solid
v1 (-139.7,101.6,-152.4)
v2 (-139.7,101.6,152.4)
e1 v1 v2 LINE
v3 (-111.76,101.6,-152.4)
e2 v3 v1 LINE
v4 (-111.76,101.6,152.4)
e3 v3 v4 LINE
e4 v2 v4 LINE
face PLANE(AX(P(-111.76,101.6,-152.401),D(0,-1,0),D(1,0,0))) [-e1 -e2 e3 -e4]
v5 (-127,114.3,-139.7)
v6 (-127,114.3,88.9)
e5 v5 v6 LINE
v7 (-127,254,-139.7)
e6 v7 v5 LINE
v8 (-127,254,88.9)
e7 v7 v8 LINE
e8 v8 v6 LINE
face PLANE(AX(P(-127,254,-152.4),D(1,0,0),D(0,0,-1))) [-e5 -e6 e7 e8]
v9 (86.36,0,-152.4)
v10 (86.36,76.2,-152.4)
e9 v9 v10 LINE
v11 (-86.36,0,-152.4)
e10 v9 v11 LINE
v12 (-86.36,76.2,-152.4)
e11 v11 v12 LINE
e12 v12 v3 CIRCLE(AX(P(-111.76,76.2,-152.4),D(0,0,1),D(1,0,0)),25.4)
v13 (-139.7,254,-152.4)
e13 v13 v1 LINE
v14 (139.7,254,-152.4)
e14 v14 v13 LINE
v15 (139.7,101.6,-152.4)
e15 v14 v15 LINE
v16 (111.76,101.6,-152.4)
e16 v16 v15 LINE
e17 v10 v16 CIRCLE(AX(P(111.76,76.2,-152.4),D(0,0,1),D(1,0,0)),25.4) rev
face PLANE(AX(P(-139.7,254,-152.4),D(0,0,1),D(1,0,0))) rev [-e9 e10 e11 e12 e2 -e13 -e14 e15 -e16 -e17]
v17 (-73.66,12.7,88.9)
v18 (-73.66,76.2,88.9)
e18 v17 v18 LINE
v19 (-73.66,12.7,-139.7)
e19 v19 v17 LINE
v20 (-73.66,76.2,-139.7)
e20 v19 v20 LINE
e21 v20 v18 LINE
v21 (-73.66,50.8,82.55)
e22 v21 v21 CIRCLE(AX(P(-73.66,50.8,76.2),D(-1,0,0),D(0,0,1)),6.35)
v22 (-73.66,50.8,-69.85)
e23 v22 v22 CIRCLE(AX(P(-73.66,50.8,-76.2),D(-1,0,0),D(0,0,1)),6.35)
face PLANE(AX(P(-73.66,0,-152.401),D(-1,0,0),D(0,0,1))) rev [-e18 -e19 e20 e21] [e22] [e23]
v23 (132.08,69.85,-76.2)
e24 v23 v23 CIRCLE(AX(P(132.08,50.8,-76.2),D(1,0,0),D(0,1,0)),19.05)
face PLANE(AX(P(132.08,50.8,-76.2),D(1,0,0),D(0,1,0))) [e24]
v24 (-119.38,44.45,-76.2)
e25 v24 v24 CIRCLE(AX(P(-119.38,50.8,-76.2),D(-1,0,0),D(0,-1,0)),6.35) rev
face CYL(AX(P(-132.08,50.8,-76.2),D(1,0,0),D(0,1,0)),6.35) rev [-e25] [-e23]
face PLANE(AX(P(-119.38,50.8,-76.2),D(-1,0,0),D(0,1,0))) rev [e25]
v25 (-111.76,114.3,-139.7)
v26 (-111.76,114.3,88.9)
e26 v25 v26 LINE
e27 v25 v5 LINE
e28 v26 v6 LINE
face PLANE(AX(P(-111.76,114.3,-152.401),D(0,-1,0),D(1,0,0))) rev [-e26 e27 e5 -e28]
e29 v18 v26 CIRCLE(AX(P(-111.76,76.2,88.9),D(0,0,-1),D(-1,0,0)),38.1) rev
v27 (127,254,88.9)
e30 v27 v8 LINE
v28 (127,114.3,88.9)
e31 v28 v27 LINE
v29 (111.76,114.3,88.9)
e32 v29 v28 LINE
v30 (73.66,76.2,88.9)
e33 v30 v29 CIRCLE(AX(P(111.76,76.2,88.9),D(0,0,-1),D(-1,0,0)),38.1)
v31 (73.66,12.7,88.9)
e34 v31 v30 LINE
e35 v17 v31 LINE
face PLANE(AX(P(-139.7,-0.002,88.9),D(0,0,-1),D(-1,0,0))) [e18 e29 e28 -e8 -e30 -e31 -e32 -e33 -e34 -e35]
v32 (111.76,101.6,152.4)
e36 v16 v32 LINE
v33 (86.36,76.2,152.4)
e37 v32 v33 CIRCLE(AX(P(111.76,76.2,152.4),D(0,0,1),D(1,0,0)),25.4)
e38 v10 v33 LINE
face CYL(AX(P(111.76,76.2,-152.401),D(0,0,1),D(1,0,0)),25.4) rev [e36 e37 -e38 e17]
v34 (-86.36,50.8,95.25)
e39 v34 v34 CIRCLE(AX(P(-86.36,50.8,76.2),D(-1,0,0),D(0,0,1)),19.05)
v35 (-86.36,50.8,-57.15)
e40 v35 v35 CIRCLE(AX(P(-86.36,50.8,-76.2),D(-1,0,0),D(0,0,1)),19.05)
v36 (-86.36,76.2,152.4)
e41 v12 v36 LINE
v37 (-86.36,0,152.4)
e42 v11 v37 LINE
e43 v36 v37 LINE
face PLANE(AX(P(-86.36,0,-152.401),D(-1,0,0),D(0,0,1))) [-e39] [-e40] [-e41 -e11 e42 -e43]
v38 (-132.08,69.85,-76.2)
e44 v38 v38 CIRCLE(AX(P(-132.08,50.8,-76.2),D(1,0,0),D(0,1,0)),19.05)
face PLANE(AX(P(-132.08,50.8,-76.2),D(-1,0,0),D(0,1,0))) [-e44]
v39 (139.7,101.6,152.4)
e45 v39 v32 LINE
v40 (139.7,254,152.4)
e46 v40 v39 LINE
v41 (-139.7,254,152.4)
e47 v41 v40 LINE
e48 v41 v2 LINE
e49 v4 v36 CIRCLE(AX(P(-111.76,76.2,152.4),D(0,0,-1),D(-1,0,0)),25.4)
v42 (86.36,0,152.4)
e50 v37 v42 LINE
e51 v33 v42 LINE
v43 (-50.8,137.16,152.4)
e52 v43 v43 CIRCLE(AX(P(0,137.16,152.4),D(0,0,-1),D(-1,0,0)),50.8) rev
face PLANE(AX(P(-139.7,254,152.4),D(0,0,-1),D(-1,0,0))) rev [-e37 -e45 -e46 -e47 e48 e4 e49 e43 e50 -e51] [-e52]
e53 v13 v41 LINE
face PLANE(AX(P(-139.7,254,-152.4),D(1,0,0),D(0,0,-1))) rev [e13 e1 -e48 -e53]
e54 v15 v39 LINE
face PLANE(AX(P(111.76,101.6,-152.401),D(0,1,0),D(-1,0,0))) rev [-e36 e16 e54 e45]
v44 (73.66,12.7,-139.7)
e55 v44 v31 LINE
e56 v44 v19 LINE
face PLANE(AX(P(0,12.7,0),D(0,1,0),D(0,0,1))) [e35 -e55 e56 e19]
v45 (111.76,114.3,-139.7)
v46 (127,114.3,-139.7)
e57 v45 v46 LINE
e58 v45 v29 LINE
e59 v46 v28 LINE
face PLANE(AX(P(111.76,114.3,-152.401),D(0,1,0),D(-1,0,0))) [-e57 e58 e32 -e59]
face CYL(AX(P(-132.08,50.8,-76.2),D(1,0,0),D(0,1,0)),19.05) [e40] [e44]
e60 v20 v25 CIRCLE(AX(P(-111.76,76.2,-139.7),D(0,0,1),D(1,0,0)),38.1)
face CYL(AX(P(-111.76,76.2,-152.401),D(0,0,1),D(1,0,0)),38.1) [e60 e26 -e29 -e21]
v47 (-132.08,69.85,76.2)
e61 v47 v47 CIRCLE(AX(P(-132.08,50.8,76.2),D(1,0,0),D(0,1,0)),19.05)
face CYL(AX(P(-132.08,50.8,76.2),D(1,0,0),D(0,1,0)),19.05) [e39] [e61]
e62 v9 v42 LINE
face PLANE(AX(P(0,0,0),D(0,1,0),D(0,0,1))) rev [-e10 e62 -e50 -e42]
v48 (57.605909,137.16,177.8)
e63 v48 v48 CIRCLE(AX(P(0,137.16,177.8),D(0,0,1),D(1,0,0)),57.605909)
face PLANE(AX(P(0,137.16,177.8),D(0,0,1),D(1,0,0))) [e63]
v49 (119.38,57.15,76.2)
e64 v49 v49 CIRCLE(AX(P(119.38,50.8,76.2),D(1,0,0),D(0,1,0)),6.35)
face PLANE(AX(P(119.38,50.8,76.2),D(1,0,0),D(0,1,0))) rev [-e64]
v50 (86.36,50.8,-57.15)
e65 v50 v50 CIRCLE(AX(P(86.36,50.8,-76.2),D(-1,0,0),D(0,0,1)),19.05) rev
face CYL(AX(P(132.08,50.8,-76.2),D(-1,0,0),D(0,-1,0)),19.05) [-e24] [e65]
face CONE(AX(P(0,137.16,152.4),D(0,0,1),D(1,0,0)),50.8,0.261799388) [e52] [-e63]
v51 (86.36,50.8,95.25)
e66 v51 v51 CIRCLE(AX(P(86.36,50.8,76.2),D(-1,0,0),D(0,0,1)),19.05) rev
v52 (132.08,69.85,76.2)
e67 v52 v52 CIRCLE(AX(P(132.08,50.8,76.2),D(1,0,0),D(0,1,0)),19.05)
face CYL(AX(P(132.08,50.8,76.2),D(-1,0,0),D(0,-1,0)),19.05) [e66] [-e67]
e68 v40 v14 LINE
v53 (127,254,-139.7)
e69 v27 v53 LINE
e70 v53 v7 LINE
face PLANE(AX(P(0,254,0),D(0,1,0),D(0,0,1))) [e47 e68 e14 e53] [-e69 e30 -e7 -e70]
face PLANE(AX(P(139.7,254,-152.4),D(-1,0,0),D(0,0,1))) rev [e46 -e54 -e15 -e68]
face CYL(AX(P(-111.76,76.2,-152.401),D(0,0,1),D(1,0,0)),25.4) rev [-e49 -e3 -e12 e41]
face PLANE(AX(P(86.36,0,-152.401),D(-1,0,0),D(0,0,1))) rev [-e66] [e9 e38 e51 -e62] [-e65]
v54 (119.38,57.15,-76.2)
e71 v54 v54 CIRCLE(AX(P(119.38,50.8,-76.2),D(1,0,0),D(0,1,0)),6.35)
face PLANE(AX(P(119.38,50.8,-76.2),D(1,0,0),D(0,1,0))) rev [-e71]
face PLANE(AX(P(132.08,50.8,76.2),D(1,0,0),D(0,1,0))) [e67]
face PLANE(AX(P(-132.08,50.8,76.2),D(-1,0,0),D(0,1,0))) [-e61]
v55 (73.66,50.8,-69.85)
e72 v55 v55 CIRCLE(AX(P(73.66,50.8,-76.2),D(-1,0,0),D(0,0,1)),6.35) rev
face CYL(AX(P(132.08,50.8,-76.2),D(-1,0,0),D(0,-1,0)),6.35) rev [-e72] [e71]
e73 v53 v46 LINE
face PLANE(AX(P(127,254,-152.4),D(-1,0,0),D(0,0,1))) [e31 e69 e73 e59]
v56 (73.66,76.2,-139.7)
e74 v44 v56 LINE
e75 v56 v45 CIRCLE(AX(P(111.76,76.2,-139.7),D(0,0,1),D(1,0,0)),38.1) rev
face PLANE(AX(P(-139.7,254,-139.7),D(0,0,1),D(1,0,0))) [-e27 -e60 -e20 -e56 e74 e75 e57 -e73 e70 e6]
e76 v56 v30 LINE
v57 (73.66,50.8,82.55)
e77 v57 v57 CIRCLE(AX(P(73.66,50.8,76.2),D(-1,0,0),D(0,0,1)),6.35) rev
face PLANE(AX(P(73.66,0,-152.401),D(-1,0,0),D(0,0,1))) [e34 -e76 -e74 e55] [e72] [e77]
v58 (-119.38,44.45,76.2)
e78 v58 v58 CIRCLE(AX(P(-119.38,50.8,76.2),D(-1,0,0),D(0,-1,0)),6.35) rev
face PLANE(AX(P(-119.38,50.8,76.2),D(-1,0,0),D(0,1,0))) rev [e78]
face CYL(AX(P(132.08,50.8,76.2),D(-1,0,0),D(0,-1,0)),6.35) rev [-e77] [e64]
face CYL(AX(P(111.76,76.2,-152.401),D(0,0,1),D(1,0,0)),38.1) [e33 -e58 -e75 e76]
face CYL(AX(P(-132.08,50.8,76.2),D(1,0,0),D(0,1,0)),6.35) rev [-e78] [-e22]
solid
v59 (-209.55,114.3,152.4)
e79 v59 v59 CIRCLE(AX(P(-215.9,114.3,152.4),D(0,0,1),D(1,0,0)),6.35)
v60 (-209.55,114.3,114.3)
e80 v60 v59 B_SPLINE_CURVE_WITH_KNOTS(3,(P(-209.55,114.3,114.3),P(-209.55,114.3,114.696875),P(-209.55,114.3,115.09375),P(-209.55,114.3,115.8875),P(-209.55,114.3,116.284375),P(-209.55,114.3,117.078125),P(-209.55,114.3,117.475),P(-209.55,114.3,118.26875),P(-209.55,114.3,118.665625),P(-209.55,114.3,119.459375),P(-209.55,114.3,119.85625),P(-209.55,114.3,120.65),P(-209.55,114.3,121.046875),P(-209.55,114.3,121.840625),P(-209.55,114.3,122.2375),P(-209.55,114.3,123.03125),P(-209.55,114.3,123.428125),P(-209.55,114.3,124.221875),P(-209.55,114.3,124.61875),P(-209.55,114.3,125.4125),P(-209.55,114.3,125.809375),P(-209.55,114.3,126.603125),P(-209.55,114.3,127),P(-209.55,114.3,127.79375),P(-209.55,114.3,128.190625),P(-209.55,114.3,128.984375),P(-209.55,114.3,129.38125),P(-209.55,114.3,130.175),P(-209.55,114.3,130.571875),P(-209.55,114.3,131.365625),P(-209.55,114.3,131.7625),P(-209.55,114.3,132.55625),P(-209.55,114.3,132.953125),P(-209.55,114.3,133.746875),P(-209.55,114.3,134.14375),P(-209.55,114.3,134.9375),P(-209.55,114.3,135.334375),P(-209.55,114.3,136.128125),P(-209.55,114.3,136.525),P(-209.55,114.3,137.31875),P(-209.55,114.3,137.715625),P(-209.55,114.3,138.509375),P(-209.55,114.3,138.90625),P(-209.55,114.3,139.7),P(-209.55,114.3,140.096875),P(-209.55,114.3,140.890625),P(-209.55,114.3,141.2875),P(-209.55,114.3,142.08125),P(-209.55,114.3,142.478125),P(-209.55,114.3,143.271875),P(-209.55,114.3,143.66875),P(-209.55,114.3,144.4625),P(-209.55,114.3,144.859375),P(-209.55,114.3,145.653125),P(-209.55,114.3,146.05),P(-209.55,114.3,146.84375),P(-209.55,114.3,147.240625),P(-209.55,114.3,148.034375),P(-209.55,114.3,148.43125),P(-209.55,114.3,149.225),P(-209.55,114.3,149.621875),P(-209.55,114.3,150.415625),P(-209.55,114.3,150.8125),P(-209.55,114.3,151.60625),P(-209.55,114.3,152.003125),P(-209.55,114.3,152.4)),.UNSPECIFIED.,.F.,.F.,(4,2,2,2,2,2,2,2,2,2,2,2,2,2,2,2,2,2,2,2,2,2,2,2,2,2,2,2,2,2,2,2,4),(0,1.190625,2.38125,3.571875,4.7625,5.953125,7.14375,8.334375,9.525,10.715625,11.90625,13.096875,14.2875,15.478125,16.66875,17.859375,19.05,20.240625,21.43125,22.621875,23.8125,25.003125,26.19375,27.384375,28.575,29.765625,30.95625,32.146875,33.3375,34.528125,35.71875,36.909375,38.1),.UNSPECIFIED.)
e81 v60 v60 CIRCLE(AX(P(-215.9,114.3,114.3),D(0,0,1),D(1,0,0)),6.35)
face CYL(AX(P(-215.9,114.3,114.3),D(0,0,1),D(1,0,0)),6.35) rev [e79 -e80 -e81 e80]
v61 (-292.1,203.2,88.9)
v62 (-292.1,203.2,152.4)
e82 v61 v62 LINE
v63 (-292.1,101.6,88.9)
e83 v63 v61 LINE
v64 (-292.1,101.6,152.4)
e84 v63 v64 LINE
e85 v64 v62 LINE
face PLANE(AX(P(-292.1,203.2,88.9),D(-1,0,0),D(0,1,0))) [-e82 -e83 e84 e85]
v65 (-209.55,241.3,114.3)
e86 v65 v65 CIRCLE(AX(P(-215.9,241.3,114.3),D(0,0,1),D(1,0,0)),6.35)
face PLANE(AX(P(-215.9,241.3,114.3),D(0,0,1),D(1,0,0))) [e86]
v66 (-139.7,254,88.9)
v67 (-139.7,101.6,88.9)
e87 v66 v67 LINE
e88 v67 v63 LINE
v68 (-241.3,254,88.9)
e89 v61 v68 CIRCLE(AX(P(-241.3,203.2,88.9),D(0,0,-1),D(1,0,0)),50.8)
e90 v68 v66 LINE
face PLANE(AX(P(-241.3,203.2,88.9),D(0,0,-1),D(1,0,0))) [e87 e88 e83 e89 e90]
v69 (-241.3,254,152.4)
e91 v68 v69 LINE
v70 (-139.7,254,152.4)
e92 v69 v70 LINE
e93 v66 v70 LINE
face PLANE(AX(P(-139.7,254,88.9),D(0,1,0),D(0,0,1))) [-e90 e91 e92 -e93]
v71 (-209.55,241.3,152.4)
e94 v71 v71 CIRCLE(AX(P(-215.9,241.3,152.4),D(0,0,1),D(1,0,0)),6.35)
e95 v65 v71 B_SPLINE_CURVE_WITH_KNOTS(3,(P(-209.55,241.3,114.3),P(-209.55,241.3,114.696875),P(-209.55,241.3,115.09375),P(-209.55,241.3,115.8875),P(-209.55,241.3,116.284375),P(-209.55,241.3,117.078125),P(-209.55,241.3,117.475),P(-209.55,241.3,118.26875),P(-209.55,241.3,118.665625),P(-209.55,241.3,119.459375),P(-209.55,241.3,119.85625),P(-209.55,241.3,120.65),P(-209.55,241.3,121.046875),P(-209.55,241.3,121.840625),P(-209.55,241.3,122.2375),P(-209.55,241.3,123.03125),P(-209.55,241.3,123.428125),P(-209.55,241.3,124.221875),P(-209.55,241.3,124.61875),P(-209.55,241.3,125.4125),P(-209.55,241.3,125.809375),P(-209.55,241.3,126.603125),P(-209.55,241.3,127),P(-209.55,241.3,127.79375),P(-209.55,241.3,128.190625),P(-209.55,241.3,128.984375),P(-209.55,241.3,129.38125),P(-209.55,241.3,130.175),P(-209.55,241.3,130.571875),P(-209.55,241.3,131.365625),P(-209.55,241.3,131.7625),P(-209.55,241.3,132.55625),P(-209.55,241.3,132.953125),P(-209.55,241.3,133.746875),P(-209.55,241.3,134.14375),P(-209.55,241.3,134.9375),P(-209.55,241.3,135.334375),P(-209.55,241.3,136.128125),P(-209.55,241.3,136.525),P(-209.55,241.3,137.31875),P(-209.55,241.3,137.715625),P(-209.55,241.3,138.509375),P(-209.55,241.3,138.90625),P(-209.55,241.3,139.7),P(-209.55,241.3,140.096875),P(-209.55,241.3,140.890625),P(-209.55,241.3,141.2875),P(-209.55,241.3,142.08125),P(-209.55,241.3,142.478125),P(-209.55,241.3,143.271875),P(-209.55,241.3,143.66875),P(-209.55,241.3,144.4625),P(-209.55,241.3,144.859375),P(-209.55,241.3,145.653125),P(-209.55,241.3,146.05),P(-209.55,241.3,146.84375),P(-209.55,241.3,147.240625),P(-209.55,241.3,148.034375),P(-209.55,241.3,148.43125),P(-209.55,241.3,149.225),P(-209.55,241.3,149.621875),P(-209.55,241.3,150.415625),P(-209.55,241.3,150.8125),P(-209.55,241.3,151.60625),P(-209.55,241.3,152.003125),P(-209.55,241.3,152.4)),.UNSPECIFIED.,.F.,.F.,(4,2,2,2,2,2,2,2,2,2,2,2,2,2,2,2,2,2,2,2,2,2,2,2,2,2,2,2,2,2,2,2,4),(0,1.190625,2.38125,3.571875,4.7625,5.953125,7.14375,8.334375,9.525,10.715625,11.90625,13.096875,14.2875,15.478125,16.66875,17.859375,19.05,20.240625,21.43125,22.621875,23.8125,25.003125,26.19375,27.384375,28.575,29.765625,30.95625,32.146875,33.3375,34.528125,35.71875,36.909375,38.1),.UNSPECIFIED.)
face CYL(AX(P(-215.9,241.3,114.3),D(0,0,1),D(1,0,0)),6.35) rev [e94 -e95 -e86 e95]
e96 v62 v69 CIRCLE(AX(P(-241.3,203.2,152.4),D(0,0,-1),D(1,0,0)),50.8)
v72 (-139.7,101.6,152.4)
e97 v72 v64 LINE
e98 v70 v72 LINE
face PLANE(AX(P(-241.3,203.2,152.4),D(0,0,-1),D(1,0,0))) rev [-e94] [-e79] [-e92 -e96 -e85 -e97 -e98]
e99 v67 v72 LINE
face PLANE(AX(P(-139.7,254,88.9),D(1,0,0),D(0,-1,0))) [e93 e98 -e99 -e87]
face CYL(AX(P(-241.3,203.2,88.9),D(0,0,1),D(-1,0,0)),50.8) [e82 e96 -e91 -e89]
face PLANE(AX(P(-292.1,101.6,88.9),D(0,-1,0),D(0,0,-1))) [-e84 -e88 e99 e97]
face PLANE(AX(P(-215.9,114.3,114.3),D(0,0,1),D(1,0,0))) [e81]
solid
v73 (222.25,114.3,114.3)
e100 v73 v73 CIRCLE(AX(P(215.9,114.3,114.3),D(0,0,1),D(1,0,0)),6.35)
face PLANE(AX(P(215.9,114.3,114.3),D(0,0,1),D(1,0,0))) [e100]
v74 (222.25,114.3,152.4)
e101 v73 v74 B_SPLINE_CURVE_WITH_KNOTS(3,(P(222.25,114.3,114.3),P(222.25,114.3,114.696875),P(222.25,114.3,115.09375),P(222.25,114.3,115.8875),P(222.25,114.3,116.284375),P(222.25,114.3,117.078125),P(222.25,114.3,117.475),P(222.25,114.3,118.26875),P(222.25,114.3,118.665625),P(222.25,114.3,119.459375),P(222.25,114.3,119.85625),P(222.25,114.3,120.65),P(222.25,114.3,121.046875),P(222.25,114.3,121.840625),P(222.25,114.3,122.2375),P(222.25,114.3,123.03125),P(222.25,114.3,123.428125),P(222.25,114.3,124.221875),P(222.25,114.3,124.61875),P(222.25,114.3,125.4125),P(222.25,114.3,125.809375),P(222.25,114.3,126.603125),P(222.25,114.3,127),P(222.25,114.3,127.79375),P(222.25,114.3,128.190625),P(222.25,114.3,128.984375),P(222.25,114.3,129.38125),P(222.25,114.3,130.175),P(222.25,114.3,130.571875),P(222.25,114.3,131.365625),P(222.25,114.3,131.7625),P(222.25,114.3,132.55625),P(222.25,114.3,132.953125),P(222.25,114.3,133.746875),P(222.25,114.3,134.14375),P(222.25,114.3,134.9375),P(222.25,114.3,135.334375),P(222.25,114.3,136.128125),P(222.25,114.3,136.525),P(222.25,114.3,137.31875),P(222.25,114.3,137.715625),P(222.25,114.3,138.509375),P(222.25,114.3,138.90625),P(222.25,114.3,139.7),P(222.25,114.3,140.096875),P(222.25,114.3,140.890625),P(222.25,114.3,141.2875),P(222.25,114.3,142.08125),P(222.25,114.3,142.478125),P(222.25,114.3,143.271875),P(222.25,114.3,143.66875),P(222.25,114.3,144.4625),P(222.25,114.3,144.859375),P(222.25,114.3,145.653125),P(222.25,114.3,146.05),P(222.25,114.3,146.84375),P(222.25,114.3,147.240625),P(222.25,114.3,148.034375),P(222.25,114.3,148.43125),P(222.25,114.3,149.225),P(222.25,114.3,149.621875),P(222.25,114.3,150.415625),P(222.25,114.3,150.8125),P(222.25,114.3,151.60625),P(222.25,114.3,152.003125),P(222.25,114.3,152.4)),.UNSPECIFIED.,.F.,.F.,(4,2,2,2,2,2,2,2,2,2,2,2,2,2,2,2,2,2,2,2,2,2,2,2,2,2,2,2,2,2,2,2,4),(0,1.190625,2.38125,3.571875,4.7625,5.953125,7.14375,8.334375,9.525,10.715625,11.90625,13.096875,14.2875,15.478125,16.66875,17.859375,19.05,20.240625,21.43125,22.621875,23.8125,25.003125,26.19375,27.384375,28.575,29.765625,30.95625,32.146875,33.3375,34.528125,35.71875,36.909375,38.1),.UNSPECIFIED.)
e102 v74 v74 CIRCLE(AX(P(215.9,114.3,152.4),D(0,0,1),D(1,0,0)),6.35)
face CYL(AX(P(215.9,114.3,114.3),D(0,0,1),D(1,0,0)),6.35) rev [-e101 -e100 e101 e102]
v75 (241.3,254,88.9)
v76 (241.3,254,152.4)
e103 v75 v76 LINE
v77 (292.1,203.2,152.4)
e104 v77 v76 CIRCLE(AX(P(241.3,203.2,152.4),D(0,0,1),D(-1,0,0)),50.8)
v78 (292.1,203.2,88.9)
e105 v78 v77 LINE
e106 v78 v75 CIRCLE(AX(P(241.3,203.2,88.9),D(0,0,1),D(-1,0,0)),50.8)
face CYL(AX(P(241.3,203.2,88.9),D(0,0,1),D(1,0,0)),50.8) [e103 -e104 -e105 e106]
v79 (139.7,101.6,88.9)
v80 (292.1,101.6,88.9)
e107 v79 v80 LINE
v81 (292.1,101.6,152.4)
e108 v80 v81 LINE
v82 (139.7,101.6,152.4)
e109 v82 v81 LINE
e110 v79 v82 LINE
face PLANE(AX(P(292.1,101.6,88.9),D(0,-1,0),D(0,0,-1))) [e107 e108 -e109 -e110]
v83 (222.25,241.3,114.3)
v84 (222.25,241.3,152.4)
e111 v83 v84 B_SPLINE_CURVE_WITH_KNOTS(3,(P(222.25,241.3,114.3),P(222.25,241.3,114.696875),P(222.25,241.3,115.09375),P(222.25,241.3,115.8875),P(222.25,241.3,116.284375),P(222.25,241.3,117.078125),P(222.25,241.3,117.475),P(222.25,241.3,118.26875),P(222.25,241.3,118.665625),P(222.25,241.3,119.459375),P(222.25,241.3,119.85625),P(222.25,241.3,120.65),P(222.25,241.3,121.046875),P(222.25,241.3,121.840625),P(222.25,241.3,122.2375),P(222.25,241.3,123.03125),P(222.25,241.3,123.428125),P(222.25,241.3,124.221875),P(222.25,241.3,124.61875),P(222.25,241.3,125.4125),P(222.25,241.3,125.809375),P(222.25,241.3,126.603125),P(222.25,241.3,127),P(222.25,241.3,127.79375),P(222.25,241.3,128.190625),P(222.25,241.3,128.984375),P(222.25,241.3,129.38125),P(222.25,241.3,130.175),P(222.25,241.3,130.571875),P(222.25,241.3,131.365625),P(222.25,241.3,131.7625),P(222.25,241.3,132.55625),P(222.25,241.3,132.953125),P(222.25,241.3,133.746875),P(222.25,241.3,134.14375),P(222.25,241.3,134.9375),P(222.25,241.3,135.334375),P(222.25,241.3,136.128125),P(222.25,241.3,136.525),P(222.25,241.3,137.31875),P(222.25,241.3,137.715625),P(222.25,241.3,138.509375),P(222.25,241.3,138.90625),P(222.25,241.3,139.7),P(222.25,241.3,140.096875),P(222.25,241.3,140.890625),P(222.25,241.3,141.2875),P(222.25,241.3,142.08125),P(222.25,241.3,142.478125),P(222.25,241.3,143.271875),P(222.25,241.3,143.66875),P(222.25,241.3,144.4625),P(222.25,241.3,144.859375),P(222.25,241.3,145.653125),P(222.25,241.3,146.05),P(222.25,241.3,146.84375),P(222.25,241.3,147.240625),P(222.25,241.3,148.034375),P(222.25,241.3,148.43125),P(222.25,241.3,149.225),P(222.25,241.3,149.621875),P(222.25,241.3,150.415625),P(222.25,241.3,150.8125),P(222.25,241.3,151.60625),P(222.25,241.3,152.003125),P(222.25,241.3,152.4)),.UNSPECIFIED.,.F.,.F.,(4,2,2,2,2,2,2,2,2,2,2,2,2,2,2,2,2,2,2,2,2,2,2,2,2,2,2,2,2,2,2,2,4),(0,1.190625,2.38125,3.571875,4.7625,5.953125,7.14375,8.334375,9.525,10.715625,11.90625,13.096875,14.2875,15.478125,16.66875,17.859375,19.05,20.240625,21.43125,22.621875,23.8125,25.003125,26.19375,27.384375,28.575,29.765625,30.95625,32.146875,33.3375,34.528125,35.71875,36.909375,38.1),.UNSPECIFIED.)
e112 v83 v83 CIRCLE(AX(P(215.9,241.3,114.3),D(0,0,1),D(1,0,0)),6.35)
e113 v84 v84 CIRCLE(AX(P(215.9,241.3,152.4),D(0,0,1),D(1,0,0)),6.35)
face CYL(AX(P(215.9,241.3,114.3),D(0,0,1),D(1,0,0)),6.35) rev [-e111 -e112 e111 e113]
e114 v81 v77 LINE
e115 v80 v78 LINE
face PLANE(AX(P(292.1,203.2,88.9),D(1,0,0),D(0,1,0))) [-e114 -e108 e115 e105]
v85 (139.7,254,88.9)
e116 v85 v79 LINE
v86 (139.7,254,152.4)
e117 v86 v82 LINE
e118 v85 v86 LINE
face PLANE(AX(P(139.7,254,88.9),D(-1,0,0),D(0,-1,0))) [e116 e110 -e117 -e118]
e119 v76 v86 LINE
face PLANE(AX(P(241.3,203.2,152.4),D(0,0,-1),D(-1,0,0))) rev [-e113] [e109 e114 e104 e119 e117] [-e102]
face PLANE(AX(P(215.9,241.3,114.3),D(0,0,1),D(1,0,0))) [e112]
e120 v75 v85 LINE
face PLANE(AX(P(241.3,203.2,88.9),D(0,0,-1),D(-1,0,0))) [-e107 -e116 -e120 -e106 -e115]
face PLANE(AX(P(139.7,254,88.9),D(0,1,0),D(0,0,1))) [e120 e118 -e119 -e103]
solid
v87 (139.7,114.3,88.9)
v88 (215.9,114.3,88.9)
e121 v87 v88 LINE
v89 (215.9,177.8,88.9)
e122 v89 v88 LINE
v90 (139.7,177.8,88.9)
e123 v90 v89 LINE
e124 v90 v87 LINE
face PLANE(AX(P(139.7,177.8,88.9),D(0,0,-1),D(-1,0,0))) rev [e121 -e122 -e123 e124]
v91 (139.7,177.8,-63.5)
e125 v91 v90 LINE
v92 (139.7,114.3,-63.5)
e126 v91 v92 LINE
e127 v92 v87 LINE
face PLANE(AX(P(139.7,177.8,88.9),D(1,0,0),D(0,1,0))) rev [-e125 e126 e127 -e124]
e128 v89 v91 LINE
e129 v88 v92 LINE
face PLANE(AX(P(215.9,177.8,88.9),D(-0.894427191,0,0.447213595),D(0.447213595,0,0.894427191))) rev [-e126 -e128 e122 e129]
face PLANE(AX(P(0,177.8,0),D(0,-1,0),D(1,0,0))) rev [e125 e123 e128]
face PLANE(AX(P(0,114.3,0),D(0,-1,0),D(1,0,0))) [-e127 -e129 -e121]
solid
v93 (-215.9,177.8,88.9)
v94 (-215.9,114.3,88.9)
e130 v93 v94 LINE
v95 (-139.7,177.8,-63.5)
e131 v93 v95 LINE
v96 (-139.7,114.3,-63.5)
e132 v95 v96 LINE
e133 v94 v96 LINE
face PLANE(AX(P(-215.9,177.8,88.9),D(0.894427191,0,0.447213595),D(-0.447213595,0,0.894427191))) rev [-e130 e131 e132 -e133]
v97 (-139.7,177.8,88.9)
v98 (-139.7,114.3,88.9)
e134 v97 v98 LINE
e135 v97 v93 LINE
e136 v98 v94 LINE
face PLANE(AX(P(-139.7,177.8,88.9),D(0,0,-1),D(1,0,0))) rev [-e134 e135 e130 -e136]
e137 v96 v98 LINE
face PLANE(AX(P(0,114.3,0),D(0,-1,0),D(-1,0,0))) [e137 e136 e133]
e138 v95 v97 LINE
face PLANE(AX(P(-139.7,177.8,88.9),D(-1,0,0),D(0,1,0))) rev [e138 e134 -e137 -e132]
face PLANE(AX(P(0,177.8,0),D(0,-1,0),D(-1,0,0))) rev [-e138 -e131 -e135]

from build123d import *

# Parameters (mm, degrees)
SKETCH1_W           = 279.4
SKETCH1_H           = 304.8
BOSS_EXTRUDE1_DEPTH = 254
CUT_EXTRUDE2_REACH  = 422.637
SKETCH6_R           = 19.05
BOSS_EXTRUDE4_DEPTH = 45.72
SHELL3_T            = -12.7
SKETCH2_R           = 50.8
BOSS_EXTRUDE2_DEPTH = 25.4
BOSS_EXTRUDE2_DRAFT = -15
BOSS_EXTRUDE6_REACH = 342.066
SKETCH11_W          = 279.4
SKETCH11_H          = 63.5
BOSS_EXTRUDE7_DEPTH = 63.5
GUSSET1_START       = 114.3
GUSSET1_DEPTH       = 63.5
SKETCH16_R          = 6.35
CUT_EXTRUDE4_DEPTH  = 38.1
SKETCH17_R          = 6.35
CUT_EXTRUDE5_DEPTH  = 38.1


# Read off the part's stored shape, not the designer's step: Gusset1
with BuildPart() as part:
    # Sketch1 → Boss-Extrude1 (new body)
    with BuildSketch(Plane(origin=(0, 0, 0), x_dir=(1, 0, 0), z_dir=(0, 1, 0))):
        Rectangle(SKETCH1_W, SKETCH1_H)
    extrude(amount=BOSS_EXTRUDE1_DEPTH)

    # Sketch5 → Cut-Extrude2 (cut, up to next)
    with BuildSketch(Plane.XY.offset(152.4), mode=Mode.PRIVATE) as cut_extrude2_sk1:
        with BuildLine():
            Line((86.36, 0), (86.36, 76.2))
            ThreePointArc((86.36, 76.2), (93.799487758, 94.160512242), (111.76, 101.6))
            Line((111.76, 101.6), (139.7, 101.6))
            Line((139.7, 101.6), (139.7, 0))
            Line((139.7, 0), (86.36, 0))
        make_face()
    cut_extrude2_tool1 = extrude(cut_extrude2_sk1.sketch, amount=-CUT_EXTRUDE2_REACH, mode=Mode.PRIVATE) & part.part
    cut_extrude2 = cut_extrude2_tool1.solids().sort_by_distance((113.580478, 49.616891, 152.4))[0]
    add(cut_extrude2, mode=Mode.SUBTRACT)

    # Mirror17: Cut-Extrude2 across plane
    add(cut_extrude2.mirror(Plane(origin=(0, 0, 0), x_dir=(0, 0, 1), z_dir=(1, 0, 0))), mode=Mode.SUBTRACT)

    # Sketch6 → Boss-Extrude4 (add)
    with BuildSketch(Plane(origin=(86.36, 0, 0), x_dir=(0, 0, -1), z_dir=(1, 0, 0))):
        with Locations(Location((-76.2, 50.8, 0), (0, 0, 180))):
            Circle(SKETCH6_R)
        with Locations(Location((76.2, 50.8, 0), (0, 0, 180))):
            Circle(SKETCH6_R)
    boss_extrude4 = extrude(amount=BOSS_EXTRUDE4_DEPTH)

    # Mirror18: Boss-Extrude4 across plane
    add(boss_extrude4.mirror(Plane(origin=(0, 0, 0), x_dir=(0, 0, 1), z_dir=(1, 0, 0))))

    # Shell3
    shell3_openings = [part.faces().sort_by_distance(p)[0] for p in [
        (0, 254, 0),
    ]]
    offset(amount=SHELL3_T, openings=shell3_openings, kind=Kind.INTERSECTION)


with BuildPart() as boss_extrude2_tool:
    # Sketch2 → Boss-Extrude2 (with draft: the straight prism first)
    with BuildSketch(Plane.XY.offset(152.4)):
        with Locations((0, 137.16)):
            Circle(SKETCH2_R)
    extrude(amount=BOSS_EXTRUDE2_DEPTH)
    # Boss-Extrude2: the draft: its side faces are tilted about the plane it starts from
    boss_extrude2_sides = [boss_extrude2_tool.faces().sort_by_distance(p)[0] for p in [
        (-50.8, 137.16, 165.1),
    ]]
    draft(boss_extrude2_sides, Plane.XY.offset(152.4), BOSS_EXTRUDE2_DRAFT)


with BuildPart() as part_1:
    add(part.part)

    # Boss-Extrude2: add boss_extrude2_tool
    add(boss_extrude2_tool.part)

    # Sketch11 → Boss-Extrude6 (add, up to next)
    with BuildSketch(Plane(origin=(0, 254, 0), x_dir=(1, 0, 0), z_dir=(0, 1, 0)), mode=Mode.PRIVATE) as boss_extrude6_sk1:
        with Locations((0, -120.65)):
            Rectangle(SKETCH11_W, SKETCH11_H)
    boss_extrude6_tool1 = extrude(boss_extrude6_sk1.sketch, amount=-BOSS_EXTRUDE6_REACH, mode=Mode.PRIVATE) - part_1.part
    add(boss_extrude6_tool1.solids().sort_by_distance((0, 254, 120.65))[0])


with BuildPart() as body_2:
    # Sketch12 → Boss-Extrude7 (new body)
    with BuildSketch(Plane.XY.offset(152.4)):
        with BuildLine():
            Line((139.7, 254), (139.7, 101.6))
            Line((139.7, 101.6), (292.1, 101.6))
            Line((292.1, 101.6), (292.1, 203.2))
            ThreePointArc((292.1, 203.2), (277.221024484, 239.121024484), (241.3, 254))
            Line((241.3, 254), (139.7, 254))
        make_face()
    extrude(amount=-BOSS_EXTRUDE7_DEPTH)


with BuildPart() as body_3:
    # Mirror7: mirrored copy
    add(body_2.part.mirror(Plane(origin=(0, 0, 0), x_dir=(0, 0, 1), z_dir=(1, 0, 0))))

    # Sketch17 → Cut-Extrude5 (cut)
    with BuildSketch(Plane.XY.offset(152.4)):
        with Locations((-215.9, 241.3)):
            Circle(SKETCH17_R)
        with Locations((-215.9, 114.3)):
            Circle(SKETCH17_R)
    extrude(amount=-CUT_EXTRUDE5_DEPTH, mode=Mode.SUBTRACT)


with BuildPart() as body_4:
    # Gusset1 outline → Gusset1 (new body)
    with BuildSketch(Plane(origin=(0, 0, 0), x_dir=(1, 0, 0), z_dir=(0, 1, 0)).offset(GUSSET1_START)):
        Polygon((215.9, -88.9), (139.7, 63.5), (139.7, -88.9), align=None)
    extrude(amount=GUSSET1_DEPTH)


with BuildPart() as body_2_1:
    add(body_2.part)

    # Sketch16 → Cut-Extrude4 (cut)
    with BuildSketch(Plane.XY.offset(152.4)):
        with Locations((215.9, 114.3)):
            Circle(SKETCH16_R)
        with Locations((215.9, 241.3)):
            Circle(SKETCH16_R)
    extrude(amount=-CUT_EXTRUDE4_DEPTH, mode=Mode.SUBTRACT)


with BuildPart() as body_5:
    # Mirror13: mirrored copy
    add(body_4.part.mirror(Plane(origin=(0, 0, 0), x_dir=(0, 0, 1), z_dir=(1, 0, 0))))


solid = Compound([part_1.part, body_3.part, body_4.part, body_2_1.part, body_5.part])
